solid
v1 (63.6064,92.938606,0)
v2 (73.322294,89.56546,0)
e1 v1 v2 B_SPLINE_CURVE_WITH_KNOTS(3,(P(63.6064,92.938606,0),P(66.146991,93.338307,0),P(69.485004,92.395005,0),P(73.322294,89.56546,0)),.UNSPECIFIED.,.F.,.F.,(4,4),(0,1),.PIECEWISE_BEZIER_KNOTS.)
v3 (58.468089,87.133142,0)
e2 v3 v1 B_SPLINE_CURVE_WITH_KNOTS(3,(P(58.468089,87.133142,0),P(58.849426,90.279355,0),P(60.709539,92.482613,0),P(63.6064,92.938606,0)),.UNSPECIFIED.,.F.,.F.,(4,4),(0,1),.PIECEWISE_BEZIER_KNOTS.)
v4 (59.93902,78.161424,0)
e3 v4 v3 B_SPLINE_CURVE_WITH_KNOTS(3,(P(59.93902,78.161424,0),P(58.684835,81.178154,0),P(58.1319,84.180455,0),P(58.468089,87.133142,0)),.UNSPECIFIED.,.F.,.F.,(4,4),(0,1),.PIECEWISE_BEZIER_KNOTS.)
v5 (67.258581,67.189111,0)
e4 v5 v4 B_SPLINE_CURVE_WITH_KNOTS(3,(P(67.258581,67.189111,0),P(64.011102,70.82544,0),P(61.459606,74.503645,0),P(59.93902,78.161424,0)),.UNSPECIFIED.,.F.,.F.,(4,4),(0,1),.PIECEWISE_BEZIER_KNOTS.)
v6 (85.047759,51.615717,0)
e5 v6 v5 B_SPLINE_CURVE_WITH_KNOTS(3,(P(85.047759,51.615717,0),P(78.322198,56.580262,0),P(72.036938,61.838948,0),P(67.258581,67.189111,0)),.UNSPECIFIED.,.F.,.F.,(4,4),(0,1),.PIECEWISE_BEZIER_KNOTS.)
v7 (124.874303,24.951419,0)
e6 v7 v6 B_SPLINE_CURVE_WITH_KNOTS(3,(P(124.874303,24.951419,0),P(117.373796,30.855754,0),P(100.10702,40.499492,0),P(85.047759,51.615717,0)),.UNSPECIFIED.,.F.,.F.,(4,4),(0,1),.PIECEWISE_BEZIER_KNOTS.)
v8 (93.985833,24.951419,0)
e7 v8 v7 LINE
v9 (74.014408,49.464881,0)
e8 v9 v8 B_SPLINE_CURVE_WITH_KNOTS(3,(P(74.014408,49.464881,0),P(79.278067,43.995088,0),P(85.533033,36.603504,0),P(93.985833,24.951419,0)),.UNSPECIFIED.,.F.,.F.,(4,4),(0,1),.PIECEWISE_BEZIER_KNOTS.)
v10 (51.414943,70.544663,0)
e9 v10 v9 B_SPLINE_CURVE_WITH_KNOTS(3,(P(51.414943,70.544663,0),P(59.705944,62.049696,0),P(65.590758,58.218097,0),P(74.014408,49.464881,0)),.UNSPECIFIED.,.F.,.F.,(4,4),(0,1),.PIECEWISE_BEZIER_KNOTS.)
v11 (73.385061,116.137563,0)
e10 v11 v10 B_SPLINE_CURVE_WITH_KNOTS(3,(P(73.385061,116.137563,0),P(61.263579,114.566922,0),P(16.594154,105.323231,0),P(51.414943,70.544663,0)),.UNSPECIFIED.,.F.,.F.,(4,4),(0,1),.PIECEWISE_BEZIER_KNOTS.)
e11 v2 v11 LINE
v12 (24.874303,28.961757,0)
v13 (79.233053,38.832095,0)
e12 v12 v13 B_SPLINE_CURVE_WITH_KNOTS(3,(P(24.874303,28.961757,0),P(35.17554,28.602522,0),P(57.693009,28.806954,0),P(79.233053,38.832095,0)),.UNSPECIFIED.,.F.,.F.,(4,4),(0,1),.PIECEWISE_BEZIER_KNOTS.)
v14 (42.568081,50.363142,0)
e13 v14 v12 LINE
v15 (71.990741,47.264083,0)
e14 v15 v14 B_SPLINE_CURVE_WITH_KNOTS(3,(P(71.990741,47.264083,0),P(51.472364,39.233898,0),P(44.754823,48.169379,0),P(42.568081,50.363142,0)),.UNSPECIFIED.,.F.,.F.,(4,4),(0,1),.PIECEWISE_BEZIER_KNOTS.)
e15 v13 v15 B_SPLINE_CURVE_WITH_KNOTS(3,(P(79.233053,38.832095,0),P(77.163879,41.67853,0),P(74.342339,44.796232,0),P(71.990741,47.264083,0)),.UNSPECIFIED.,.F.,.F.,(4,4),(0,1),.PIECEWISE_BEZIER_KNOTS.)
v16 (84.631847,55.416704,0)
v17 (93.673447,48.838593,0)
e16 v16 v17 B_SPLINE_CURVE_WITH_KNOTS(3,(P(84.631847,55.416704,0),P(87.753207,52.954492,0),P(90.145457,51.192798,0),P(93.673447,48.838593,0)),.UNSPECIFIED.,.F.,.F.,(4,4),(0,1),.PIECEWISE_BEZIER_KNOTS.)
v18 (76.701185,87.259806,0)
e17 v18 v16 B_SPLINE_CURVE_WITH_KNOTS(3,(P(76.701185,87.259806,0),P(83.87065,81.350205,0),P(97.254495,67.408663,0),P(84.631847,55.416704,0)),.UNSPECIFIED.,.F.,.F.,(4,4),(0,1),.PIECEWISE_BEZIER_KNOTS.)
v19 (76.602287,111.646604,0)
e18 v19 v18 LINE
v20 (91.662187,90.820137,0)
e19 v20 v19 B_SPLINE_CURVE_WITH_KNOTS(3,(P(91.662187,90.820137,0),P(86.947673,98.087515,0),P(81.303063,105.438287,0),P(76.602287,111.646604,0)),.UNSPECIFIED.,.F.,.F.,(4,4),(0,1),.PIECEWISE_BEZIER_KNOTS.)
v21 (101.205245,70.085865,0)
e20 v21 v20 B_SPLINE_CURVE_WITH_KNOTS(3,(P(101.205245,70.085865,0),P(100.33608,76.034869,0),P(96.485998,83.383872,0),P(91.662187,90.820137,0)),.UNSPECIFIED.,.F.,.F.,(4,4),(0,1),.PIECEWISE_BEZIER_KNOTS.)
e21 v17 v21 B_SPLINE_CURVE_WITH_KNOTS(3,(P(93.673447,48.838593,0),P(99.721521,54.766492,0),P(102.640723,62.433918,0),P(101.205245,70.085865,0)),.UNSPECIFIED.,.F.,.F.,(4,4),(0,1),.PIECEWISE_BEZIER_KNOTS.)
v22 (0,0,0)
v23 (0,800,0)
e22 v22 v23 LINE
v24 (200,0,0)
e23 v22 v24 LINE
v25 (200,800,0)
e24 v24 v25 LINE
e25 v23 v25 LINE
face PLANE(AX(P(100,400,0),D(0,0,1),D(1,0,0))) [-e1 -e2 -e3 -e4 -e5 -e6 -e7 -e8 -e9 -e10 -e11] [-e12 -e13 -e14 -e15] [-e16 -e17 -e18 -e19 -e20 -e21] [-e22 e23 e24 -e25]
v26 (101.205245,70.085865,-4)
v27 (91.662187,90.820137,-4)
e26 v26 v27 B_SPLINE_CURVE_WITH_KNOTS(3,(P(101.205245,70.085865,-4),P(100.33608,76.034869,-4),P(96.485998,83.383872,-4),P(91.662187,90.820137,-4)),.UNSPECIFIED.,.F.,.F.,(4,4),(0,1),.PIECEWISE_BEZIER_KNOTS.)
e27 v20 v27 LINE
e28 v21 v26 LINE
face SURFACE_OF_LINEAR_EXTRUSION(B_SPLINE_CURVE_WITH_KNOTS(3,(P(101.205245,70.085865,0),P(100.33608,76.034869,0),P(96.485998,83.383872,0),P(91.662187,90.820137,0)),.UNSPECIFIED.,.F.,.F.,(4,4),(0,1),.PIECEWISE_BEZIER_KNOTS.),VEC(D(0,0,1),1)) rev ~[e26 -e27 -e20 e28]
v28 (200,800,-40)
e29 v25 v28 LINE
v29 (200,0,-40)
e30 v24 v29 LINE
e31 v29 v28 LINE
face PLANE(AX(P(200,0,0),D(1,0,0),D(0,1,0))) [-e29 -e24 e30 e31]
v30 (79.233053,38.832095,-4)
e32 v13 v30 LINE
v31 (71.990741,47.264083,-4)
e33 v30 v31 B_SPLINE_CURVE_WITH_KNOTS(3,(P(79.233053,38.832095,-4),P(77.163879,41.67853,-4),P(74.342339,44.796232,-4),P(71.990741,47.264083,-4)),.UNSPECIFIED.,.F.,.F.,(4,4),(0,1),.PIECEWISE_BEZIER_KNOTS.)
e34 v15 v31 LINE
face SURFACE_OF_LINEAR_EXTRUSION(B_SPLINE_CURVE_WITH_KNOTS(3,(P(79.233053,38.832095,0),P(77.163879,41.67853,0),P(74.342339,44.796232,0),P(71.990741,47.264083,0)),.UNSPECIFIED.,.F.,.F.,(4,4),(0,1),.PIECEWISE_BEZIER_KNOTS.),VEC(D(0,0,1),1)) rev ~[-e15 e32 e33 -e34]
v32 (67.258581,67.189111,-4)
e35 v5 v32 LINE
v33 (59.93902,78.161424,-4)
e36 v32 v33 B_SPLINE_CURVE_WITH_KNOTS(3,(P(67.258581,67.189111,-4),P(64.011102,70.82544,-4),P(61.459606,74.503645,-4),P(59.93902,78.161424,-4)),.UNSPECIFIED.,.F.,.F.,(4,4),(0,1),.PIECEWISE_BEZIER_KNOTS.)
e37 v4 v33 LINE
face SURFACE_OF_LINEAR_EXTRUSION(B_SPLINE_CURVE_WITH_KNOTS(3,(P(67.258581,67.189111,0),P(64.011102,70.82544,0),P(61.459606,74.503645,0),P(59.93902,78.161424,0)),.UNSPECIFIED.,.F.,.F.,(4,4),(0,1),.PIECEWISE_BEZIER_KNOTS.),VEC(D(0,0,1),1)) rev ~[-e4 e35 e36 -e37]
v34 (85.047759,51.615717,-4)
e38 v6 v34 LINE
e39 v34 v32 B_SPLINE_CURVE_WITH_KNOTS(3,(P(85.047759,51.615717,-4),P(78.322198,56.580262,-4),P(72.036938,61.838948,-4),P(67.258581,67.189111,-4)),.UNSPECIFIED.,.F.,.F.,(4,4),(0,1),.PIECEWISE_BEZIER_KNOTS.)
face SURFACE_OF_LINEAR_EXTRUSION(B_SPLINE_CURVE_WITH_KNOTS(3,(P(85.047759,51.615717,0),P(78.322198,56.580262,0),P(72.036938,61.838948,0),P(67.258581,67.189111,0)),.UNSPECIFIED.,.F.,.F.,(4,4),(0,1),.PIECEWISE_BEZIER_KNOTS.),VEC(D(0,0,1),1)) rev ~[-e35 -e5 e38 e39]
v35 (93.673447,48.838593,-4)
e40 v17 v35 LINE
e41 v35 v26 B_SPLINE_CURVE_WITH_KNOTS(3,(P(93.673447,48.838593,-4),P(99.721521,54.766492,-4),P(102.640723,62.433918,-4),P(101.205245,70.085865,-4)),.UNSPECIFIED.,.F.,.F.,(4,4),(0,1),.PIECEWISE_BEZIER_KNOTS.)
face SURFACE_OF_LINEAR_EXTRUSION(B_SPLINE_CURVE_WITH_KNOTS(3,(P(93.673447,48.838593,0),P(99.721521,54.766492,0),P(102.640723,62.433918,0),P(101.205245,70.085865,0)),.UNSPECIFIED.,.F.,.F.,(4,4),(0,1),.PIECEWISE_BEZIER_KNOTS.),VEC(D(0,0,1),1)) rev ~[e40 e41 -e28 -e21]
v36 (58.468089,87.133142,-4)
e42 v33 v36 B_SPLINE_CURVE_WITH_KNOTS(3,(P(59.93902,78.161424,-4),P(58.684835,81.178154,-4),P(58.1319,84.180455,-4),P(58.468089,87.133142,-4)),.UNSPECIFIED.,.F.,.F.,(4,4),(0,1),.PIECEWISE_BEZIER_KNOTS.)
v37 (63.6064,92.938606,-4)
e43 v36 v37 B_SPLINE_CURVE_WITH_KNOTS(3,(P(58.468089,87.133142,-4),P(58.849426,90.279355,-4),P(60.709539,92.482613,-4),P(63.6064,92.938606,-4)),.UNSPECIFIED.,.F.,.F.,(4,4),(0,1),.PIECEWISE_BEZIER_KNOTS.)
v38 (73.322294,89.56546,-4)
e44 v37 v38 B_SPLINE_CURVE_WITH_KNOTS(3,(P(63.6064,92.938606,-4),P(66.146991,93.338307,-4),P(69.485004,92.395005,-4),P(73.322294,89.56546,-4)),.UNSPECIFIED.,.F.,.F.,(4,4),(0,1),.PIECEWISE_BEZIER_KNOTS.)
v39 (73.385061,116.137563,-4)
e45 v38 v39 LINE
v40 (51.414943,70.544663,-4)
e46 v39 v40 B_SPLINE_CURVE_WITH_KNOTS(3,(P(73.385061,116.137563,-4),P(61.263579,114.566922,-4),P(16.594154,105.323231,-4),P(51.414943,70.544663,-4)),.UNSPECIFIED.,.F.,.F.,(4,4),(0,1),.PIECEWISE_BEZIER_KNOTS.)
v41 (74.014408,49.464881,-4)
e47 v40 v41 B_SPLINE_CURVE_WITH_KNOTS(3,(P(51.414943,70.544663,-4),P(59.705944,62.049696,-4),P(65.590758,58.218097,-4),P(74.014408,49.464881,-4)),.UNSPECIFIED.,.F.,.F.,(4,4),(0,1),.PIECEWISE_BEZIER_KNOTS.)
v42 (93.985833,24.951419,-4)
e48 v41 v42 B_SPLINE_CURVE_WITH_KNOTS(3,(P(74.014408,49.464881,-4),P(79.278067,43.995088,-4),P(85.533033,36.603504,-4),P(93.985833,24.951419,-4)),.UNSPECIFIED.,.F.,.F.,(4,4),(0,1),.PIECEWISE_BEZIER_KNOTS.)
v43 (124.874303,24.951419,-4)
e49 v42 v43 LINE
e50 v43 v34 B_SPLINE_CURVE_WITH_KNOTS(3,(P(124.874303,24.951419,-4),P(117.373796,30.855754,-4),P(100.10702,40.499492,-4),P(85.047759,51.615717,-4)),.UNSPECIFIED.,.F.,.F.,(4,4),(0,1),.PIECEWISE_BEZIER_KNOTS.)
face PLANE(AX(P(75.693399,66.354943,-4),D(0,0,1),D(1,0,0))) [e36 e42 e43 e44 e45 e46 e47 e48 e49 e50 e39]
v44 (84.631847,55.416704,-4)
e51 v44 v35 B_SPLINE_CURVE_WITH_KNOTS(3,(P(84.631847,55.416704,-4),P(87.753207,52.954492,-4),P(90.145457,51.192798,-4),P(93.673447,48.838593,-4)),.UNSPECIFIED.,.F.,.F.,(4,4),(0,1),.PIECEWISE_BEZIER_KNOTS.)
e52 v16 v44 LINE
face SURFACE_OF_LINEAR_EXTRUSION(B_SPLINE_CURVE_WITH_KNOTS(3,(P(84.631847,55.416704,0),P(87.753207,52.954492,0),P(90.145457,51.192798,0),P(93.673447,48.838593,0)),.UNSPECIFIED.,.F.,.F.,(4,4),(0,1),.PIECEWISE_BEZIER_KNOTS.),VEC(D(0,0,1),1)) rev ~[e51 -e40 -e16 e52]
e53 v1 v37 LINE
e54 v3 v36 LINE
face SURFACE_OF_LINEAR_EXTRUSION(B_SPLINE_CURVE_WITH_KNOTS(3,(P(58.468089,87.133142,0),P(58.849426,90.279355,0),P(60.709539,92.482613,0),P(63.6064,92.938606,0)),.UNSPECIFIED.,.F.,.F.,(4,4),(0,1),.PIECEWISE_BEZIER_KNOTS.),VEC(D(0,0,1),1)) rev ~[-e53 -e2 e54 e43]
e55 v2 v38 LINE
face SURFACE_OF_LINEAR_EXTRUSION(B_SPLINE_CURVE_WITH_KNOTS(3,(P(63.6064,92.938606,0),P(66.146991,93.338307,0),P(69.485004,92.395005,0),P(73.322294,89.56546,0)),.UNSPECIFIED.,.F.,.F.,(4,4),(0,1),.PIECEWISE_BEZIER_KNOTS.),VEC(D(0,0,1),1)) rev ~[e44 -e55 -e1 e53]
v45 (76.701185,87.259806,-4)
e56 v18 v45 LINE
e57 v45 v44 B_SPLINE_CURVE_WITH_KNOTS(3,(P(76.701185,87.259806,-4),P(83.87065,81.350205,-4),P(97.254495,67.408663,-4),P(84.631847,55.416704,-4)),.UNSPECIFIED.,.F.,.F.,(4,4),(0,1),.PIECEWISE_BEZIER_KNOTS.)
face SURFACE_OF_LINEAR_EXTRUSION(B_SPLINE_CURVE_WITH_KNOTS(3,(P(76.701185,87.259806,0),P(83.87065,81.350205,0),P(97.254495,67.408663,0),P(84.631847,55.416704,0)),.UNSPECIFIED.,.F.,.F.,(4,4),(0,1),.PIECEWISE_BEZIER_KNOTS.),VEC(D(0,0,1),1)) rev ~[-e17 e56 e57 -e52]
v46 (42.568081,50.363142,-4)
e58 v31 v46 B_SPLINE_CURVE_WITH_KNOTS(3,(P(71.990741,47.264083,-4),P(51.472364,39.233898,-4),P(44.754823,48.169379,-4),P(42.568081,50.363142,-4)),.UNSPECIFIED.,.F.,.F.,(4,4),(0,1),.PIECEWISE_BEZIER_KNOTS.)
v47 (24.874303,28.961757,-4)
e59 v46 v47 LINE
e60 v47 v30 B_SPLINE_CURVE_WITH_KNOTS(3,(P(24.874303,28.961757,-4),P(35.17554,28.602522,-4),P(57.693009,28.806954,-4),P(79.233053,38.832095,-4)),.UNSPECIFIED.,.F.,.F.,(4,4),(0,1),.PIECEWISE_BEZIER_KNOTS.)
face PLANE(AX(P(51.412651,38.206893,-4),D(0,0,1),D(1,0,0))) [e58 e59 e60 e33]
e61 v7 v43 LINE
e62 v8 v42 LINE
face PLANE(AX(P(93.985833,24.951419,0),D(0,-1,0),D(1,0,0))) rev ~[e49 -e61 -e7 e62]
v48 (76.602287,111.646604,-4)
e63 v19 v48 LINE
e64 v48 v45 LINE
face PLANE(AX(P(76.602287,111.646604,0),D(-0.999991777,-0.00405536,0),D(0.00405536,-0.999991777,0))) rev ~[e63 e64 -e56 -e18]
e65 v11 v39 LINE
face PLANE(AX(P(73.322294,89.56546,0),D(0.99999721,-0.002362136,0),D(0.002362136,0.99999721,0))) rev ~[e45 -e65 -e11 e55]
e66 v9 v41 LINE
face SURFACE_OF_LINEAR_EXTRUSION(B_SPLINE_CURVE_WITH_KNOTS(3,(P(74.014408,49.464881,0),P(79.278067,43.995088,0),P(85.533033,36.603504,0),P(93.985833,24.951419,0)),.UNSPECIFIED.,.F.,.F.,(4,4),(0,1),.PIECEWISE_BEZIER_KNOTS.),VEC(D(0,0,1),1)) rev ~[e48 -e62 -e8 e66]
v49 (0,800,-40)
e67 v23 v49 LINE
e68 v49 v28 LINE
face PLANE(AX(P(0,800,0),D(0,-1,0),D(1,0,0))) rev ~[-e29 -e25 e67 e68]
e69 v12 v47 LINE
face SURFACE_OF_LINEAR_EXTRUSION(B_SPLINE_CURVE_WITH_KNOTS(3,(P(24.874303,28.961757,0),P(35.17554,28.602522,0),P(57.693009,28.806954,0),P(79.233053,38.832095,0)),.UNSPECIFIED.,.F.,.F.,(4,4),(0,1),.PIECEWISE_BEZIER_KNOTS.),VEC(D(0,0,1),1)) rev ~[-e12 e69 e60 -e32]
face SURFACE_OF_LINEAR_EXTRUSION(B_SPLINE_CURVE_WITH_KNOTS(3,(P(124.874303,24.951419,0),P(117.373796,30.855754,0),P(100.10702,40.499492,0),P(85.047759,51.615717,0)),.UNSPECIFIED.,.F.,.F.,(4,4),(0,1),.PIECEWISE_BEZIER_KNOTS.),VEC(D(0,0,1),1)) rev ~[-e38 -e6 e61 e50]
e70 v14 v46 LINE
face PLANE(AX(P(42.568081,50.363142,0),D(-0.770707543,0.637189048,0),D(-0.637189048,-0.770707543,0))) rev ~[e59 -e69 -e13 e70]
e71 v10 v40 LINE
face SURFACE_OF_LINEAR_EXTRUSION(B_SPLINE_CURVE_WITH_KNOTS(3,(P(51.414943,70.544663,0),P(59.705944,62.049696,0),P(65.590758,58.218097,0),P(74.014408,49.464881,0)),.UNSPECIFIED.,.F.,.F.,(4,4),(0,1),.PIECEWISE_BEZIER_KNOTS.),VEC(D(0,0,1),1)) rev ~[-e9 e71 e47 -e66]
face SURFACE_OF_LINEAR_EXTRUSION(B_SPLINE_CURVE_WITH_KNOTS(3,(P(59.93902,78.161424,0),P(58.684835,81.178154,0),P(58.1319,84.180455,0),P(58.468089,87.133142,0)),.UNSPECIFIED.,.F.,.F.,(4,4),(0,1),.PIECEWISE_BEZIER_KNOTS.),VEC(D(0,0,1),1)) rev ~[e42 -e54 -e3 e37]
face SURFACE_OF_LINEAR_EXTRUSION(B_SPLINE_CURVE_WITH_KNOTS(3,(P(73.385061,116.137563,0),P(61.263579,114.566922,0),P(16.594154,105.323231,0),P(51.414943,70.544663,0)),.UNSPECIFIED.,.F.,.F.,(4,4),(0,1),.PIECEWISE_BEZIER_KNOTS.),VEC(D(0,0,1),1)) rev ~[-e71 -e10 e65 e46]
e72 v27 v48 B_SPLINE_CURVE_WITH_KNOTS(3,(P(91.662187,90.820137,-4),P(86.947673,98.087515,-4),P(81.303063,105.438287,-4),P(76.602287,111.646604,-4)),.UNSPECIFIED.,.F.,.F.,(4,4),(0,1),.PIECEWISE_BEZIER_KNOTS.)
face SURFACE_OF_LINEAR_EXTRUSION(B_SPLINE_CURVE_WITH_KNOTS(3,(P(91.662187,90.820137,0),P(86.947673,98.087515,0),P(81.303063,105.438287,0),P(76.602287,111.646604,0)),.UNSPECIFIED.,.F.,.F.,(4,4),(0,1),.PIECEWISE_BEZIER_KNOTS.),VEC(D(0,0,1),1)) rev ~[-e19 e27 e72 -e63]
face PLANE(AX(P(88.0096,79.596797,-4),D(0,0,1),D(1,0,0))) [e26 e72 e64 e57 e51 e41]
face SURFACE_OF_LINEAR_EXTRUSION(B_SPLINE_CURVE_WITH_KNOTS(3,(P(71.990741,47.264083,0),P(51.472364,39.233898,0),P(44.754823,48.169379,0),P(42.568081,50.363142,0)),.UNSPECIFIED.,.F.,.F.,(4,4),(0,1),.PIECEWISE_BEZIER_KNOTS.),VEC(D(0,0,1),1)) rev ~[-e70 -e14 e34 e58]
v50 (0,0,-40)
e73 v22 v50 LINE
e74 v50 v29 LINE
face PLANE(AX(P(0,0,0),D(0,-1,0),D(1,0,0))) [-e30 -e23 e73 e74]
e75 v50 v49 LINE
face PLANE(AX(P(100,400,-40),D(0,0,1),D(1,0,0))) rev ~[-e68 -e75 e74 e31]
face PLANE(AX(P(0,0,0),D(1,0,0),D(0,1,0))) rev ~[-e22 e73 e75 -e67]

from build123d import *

# Parameters (mm, degrees)
F0_W     = 200
F0_H     = 800
F1_DEPTH = 40
F3_DEPTH = 4


# Not quite as in the source:
# - ends of sketch curves that miss each other by under 0.0002 mm in the source are joined
# - a feature of the source that left no trace in its solid (it failed there, or was rolled back) is left out


with BuildPart() as f1:
    # F0 (on Top) → F1 (new body)
    with BuildSketch(Plane.XY):
        with Locations((100, 400)):
            Rectangle(F0_W, F0_H)
    extrude(amount=-F1_DEPTH)

    # F2 (on face) → F3 (cut)
    with BuildSketch(Plane.XY):
        with BuildLine():
            add(Edge.make_bspline(
                [(74.0144076195, 49.4648806587), (79.2780666431, 43.995087588), (85.5330334882, 36.6035044423), (93.9858326346, 24.9514187131)],
                knots=[0, 0, 0, 0, 1, 1, 1, 1], degree=3))
            Line((93.9858326346, 24.9514187131), (124.8743034899, 24.9514187131))
            add(Edge.make_bspline(
                [(124.8743034899, 24.9514187131), (117.373795502, 30.8557542171), (100.1070204646, 40.4994924549), (85.0477587545, 51.6157174292)],
                knots=[0, 0, 0, 0, 1, 1, 1, 1], degree=3))
            add(Edge.make_bspline(
                [(85.0477587545, 51.6157174292), (78.3221982923, 56.5802620007), (72.0369383461, 61.8389475301), (67.2585806524, 67.1891107778)],
                knots=[0, 0, 0, 0, 1, 1, 1, 1], degree=3))
            add(Edge.make_bspline(
                [(67.2585806524, 67.1891107778), (64.0111017086, 70.825439839), (61.4596060965, 74.5036446576), (59.9390200859, 78.1614235749)],
                knots=[0, 0, 0, 0, 1, 1, 1, 1], degree=3))
            add(Edge.make_bspline(
                [(59.9390200859, 78.1614235749), (58.6848351698, 81.1781536647), (58.1318996379, 84.1804553021), (58.4680892286, 87.1331416805)],
                knots=[0, 0, 0, 0, 1, 1, 1, 1], degree=3))
            add(Edge.make_bspline(
                [(58.4680892286, 87.1331416805), (58.8494259124, 90.279355495), (60.7095393399, 92.4826134262), (63.6064002406, 92.9386057154)],
                knots=[0, 0, 0, 0, 1, 1, 1, 1], degree=3))
            add(Edge.make_bspline(
                [(63.6064002406, 92.9386057154), (66.1469914002, 93.338307093), (69.4850038962, 92.3950054588), (73.3222940387, 89.5654596054)],
                knots=[0, 0, 0, 0, 1, 1, 1, 1], degree=3))
            Line((73.3222940387, 89.5654596054), (73.3850611313, 116.1375625051))
            add(Edge.make_bspline(
                [(73.3850611313, 116.1375625051), (61.2635786151, 114.5669223978), (16.5941537425, 105.3232312885), (51.4149430547, 70.5446634846)],
                knots=[0, 0, 0, 0, 1, 1, 1, 1], degree=3))
            add(Edge.make_bspline(
                [(51.4149430547, 70.5446634846), (59.7059440621, 62.0496960224), (65.5907579364, 58.2180974722), (74.0144076195, 49.4648806587)],
                knots=[0, 0, 0, 0, 1, 1, 1, 1], degree=3))
        make_face()
        with BuildLine():
            add(Edge.make_bspline(
                [(91.6621868878, 90.8201365516), (86.9476734338, 98.0875153234), (81.3030633718, 105.4382865607), (76.6022868683, 111.646603626)],
                knots=[0, 0, 0, 0, 1, 1, 1, 1], degree=3))
            Line((76.6022868683, 111.646603626), (76.7011849335, 87.2598062052))
            add(Edge.make_bspline(
                [(76.7011849335, 87.2598062052), (83.8706497004, 81.3502046486), (97.2544954721, 67.4086626207), (84.6318469774, 55.4167037236)],
                knots=[0, 0, 0, 0, 1, 1, 1, 1], degree=3))
            add(Edge.make_bspline(
                [(84.6318469774, 55.4167037236), (87.753206619, 52.954491641), (90.1454573299, 51.1927975466), (93.6734466659, 48.8385927365)],
                knots=[0, 0, 0, 0, 1, 1, 1, 1], degree=3))
            add(Edge.make_bspline(
                [(93.6734466659, 48.8385927365), (99.7215214715, 54.7664924964), (102.6407232018, 62.4339183966), (101.2052451133, 70.0858652935)],
                knots=[0, 0, 0, 0, 1, 1, 1, 1], degree=3))
            add(Edge.make_bspline(
                [(101.2052451133, 70.0858652935), (100.3360804582, 76.0348691585), (96.4859975312, 83.3838717469), (91.6621868878, 90.8201365516)],
                knots=[0, 0, 0, 0, 1, 1, 1, 1], degree=3))
        make_face()
        with BuildLine():
            add(Edge.make_bspline(
                [(71.9907407021, 47.2640828783), (51.4723643059, 39.233897758), (44.7548226057, 48.169378506), (42.5680809306, 50.3631415847)],
                knots=[0, 0, 0, 0, 1, 1, 1, 1], degree=3))
            Line((42.5680809306, 50.3631415847), (24.8743034899, 28.961757198))
            add(Edge.make_bspline(
                [(24.8743034899, 28.961757198), (35.1755403208, 28.6025219778), (57.6930087218, 28.8069538664), (79.2330525311, 38.8320952786)],
                knots=[0, 0, 0, 0, 1, 1, 1, 1], degree=3))
            add(Edge.make_bspline(
                [(79.2330525311, 38.8320952786), (77.1638794716, 41.6785297354), (74.3423390821, 44.7962323959), (71.9907407021, 47.2640828783)],
                knots=[0, 0, 0, 0, 1, 1, 1, 1], degree=3))
        make_face()
    extrude(amount=-F3_DEPTH, mode=Mode.SUBTRACT)


solid = f1.part
